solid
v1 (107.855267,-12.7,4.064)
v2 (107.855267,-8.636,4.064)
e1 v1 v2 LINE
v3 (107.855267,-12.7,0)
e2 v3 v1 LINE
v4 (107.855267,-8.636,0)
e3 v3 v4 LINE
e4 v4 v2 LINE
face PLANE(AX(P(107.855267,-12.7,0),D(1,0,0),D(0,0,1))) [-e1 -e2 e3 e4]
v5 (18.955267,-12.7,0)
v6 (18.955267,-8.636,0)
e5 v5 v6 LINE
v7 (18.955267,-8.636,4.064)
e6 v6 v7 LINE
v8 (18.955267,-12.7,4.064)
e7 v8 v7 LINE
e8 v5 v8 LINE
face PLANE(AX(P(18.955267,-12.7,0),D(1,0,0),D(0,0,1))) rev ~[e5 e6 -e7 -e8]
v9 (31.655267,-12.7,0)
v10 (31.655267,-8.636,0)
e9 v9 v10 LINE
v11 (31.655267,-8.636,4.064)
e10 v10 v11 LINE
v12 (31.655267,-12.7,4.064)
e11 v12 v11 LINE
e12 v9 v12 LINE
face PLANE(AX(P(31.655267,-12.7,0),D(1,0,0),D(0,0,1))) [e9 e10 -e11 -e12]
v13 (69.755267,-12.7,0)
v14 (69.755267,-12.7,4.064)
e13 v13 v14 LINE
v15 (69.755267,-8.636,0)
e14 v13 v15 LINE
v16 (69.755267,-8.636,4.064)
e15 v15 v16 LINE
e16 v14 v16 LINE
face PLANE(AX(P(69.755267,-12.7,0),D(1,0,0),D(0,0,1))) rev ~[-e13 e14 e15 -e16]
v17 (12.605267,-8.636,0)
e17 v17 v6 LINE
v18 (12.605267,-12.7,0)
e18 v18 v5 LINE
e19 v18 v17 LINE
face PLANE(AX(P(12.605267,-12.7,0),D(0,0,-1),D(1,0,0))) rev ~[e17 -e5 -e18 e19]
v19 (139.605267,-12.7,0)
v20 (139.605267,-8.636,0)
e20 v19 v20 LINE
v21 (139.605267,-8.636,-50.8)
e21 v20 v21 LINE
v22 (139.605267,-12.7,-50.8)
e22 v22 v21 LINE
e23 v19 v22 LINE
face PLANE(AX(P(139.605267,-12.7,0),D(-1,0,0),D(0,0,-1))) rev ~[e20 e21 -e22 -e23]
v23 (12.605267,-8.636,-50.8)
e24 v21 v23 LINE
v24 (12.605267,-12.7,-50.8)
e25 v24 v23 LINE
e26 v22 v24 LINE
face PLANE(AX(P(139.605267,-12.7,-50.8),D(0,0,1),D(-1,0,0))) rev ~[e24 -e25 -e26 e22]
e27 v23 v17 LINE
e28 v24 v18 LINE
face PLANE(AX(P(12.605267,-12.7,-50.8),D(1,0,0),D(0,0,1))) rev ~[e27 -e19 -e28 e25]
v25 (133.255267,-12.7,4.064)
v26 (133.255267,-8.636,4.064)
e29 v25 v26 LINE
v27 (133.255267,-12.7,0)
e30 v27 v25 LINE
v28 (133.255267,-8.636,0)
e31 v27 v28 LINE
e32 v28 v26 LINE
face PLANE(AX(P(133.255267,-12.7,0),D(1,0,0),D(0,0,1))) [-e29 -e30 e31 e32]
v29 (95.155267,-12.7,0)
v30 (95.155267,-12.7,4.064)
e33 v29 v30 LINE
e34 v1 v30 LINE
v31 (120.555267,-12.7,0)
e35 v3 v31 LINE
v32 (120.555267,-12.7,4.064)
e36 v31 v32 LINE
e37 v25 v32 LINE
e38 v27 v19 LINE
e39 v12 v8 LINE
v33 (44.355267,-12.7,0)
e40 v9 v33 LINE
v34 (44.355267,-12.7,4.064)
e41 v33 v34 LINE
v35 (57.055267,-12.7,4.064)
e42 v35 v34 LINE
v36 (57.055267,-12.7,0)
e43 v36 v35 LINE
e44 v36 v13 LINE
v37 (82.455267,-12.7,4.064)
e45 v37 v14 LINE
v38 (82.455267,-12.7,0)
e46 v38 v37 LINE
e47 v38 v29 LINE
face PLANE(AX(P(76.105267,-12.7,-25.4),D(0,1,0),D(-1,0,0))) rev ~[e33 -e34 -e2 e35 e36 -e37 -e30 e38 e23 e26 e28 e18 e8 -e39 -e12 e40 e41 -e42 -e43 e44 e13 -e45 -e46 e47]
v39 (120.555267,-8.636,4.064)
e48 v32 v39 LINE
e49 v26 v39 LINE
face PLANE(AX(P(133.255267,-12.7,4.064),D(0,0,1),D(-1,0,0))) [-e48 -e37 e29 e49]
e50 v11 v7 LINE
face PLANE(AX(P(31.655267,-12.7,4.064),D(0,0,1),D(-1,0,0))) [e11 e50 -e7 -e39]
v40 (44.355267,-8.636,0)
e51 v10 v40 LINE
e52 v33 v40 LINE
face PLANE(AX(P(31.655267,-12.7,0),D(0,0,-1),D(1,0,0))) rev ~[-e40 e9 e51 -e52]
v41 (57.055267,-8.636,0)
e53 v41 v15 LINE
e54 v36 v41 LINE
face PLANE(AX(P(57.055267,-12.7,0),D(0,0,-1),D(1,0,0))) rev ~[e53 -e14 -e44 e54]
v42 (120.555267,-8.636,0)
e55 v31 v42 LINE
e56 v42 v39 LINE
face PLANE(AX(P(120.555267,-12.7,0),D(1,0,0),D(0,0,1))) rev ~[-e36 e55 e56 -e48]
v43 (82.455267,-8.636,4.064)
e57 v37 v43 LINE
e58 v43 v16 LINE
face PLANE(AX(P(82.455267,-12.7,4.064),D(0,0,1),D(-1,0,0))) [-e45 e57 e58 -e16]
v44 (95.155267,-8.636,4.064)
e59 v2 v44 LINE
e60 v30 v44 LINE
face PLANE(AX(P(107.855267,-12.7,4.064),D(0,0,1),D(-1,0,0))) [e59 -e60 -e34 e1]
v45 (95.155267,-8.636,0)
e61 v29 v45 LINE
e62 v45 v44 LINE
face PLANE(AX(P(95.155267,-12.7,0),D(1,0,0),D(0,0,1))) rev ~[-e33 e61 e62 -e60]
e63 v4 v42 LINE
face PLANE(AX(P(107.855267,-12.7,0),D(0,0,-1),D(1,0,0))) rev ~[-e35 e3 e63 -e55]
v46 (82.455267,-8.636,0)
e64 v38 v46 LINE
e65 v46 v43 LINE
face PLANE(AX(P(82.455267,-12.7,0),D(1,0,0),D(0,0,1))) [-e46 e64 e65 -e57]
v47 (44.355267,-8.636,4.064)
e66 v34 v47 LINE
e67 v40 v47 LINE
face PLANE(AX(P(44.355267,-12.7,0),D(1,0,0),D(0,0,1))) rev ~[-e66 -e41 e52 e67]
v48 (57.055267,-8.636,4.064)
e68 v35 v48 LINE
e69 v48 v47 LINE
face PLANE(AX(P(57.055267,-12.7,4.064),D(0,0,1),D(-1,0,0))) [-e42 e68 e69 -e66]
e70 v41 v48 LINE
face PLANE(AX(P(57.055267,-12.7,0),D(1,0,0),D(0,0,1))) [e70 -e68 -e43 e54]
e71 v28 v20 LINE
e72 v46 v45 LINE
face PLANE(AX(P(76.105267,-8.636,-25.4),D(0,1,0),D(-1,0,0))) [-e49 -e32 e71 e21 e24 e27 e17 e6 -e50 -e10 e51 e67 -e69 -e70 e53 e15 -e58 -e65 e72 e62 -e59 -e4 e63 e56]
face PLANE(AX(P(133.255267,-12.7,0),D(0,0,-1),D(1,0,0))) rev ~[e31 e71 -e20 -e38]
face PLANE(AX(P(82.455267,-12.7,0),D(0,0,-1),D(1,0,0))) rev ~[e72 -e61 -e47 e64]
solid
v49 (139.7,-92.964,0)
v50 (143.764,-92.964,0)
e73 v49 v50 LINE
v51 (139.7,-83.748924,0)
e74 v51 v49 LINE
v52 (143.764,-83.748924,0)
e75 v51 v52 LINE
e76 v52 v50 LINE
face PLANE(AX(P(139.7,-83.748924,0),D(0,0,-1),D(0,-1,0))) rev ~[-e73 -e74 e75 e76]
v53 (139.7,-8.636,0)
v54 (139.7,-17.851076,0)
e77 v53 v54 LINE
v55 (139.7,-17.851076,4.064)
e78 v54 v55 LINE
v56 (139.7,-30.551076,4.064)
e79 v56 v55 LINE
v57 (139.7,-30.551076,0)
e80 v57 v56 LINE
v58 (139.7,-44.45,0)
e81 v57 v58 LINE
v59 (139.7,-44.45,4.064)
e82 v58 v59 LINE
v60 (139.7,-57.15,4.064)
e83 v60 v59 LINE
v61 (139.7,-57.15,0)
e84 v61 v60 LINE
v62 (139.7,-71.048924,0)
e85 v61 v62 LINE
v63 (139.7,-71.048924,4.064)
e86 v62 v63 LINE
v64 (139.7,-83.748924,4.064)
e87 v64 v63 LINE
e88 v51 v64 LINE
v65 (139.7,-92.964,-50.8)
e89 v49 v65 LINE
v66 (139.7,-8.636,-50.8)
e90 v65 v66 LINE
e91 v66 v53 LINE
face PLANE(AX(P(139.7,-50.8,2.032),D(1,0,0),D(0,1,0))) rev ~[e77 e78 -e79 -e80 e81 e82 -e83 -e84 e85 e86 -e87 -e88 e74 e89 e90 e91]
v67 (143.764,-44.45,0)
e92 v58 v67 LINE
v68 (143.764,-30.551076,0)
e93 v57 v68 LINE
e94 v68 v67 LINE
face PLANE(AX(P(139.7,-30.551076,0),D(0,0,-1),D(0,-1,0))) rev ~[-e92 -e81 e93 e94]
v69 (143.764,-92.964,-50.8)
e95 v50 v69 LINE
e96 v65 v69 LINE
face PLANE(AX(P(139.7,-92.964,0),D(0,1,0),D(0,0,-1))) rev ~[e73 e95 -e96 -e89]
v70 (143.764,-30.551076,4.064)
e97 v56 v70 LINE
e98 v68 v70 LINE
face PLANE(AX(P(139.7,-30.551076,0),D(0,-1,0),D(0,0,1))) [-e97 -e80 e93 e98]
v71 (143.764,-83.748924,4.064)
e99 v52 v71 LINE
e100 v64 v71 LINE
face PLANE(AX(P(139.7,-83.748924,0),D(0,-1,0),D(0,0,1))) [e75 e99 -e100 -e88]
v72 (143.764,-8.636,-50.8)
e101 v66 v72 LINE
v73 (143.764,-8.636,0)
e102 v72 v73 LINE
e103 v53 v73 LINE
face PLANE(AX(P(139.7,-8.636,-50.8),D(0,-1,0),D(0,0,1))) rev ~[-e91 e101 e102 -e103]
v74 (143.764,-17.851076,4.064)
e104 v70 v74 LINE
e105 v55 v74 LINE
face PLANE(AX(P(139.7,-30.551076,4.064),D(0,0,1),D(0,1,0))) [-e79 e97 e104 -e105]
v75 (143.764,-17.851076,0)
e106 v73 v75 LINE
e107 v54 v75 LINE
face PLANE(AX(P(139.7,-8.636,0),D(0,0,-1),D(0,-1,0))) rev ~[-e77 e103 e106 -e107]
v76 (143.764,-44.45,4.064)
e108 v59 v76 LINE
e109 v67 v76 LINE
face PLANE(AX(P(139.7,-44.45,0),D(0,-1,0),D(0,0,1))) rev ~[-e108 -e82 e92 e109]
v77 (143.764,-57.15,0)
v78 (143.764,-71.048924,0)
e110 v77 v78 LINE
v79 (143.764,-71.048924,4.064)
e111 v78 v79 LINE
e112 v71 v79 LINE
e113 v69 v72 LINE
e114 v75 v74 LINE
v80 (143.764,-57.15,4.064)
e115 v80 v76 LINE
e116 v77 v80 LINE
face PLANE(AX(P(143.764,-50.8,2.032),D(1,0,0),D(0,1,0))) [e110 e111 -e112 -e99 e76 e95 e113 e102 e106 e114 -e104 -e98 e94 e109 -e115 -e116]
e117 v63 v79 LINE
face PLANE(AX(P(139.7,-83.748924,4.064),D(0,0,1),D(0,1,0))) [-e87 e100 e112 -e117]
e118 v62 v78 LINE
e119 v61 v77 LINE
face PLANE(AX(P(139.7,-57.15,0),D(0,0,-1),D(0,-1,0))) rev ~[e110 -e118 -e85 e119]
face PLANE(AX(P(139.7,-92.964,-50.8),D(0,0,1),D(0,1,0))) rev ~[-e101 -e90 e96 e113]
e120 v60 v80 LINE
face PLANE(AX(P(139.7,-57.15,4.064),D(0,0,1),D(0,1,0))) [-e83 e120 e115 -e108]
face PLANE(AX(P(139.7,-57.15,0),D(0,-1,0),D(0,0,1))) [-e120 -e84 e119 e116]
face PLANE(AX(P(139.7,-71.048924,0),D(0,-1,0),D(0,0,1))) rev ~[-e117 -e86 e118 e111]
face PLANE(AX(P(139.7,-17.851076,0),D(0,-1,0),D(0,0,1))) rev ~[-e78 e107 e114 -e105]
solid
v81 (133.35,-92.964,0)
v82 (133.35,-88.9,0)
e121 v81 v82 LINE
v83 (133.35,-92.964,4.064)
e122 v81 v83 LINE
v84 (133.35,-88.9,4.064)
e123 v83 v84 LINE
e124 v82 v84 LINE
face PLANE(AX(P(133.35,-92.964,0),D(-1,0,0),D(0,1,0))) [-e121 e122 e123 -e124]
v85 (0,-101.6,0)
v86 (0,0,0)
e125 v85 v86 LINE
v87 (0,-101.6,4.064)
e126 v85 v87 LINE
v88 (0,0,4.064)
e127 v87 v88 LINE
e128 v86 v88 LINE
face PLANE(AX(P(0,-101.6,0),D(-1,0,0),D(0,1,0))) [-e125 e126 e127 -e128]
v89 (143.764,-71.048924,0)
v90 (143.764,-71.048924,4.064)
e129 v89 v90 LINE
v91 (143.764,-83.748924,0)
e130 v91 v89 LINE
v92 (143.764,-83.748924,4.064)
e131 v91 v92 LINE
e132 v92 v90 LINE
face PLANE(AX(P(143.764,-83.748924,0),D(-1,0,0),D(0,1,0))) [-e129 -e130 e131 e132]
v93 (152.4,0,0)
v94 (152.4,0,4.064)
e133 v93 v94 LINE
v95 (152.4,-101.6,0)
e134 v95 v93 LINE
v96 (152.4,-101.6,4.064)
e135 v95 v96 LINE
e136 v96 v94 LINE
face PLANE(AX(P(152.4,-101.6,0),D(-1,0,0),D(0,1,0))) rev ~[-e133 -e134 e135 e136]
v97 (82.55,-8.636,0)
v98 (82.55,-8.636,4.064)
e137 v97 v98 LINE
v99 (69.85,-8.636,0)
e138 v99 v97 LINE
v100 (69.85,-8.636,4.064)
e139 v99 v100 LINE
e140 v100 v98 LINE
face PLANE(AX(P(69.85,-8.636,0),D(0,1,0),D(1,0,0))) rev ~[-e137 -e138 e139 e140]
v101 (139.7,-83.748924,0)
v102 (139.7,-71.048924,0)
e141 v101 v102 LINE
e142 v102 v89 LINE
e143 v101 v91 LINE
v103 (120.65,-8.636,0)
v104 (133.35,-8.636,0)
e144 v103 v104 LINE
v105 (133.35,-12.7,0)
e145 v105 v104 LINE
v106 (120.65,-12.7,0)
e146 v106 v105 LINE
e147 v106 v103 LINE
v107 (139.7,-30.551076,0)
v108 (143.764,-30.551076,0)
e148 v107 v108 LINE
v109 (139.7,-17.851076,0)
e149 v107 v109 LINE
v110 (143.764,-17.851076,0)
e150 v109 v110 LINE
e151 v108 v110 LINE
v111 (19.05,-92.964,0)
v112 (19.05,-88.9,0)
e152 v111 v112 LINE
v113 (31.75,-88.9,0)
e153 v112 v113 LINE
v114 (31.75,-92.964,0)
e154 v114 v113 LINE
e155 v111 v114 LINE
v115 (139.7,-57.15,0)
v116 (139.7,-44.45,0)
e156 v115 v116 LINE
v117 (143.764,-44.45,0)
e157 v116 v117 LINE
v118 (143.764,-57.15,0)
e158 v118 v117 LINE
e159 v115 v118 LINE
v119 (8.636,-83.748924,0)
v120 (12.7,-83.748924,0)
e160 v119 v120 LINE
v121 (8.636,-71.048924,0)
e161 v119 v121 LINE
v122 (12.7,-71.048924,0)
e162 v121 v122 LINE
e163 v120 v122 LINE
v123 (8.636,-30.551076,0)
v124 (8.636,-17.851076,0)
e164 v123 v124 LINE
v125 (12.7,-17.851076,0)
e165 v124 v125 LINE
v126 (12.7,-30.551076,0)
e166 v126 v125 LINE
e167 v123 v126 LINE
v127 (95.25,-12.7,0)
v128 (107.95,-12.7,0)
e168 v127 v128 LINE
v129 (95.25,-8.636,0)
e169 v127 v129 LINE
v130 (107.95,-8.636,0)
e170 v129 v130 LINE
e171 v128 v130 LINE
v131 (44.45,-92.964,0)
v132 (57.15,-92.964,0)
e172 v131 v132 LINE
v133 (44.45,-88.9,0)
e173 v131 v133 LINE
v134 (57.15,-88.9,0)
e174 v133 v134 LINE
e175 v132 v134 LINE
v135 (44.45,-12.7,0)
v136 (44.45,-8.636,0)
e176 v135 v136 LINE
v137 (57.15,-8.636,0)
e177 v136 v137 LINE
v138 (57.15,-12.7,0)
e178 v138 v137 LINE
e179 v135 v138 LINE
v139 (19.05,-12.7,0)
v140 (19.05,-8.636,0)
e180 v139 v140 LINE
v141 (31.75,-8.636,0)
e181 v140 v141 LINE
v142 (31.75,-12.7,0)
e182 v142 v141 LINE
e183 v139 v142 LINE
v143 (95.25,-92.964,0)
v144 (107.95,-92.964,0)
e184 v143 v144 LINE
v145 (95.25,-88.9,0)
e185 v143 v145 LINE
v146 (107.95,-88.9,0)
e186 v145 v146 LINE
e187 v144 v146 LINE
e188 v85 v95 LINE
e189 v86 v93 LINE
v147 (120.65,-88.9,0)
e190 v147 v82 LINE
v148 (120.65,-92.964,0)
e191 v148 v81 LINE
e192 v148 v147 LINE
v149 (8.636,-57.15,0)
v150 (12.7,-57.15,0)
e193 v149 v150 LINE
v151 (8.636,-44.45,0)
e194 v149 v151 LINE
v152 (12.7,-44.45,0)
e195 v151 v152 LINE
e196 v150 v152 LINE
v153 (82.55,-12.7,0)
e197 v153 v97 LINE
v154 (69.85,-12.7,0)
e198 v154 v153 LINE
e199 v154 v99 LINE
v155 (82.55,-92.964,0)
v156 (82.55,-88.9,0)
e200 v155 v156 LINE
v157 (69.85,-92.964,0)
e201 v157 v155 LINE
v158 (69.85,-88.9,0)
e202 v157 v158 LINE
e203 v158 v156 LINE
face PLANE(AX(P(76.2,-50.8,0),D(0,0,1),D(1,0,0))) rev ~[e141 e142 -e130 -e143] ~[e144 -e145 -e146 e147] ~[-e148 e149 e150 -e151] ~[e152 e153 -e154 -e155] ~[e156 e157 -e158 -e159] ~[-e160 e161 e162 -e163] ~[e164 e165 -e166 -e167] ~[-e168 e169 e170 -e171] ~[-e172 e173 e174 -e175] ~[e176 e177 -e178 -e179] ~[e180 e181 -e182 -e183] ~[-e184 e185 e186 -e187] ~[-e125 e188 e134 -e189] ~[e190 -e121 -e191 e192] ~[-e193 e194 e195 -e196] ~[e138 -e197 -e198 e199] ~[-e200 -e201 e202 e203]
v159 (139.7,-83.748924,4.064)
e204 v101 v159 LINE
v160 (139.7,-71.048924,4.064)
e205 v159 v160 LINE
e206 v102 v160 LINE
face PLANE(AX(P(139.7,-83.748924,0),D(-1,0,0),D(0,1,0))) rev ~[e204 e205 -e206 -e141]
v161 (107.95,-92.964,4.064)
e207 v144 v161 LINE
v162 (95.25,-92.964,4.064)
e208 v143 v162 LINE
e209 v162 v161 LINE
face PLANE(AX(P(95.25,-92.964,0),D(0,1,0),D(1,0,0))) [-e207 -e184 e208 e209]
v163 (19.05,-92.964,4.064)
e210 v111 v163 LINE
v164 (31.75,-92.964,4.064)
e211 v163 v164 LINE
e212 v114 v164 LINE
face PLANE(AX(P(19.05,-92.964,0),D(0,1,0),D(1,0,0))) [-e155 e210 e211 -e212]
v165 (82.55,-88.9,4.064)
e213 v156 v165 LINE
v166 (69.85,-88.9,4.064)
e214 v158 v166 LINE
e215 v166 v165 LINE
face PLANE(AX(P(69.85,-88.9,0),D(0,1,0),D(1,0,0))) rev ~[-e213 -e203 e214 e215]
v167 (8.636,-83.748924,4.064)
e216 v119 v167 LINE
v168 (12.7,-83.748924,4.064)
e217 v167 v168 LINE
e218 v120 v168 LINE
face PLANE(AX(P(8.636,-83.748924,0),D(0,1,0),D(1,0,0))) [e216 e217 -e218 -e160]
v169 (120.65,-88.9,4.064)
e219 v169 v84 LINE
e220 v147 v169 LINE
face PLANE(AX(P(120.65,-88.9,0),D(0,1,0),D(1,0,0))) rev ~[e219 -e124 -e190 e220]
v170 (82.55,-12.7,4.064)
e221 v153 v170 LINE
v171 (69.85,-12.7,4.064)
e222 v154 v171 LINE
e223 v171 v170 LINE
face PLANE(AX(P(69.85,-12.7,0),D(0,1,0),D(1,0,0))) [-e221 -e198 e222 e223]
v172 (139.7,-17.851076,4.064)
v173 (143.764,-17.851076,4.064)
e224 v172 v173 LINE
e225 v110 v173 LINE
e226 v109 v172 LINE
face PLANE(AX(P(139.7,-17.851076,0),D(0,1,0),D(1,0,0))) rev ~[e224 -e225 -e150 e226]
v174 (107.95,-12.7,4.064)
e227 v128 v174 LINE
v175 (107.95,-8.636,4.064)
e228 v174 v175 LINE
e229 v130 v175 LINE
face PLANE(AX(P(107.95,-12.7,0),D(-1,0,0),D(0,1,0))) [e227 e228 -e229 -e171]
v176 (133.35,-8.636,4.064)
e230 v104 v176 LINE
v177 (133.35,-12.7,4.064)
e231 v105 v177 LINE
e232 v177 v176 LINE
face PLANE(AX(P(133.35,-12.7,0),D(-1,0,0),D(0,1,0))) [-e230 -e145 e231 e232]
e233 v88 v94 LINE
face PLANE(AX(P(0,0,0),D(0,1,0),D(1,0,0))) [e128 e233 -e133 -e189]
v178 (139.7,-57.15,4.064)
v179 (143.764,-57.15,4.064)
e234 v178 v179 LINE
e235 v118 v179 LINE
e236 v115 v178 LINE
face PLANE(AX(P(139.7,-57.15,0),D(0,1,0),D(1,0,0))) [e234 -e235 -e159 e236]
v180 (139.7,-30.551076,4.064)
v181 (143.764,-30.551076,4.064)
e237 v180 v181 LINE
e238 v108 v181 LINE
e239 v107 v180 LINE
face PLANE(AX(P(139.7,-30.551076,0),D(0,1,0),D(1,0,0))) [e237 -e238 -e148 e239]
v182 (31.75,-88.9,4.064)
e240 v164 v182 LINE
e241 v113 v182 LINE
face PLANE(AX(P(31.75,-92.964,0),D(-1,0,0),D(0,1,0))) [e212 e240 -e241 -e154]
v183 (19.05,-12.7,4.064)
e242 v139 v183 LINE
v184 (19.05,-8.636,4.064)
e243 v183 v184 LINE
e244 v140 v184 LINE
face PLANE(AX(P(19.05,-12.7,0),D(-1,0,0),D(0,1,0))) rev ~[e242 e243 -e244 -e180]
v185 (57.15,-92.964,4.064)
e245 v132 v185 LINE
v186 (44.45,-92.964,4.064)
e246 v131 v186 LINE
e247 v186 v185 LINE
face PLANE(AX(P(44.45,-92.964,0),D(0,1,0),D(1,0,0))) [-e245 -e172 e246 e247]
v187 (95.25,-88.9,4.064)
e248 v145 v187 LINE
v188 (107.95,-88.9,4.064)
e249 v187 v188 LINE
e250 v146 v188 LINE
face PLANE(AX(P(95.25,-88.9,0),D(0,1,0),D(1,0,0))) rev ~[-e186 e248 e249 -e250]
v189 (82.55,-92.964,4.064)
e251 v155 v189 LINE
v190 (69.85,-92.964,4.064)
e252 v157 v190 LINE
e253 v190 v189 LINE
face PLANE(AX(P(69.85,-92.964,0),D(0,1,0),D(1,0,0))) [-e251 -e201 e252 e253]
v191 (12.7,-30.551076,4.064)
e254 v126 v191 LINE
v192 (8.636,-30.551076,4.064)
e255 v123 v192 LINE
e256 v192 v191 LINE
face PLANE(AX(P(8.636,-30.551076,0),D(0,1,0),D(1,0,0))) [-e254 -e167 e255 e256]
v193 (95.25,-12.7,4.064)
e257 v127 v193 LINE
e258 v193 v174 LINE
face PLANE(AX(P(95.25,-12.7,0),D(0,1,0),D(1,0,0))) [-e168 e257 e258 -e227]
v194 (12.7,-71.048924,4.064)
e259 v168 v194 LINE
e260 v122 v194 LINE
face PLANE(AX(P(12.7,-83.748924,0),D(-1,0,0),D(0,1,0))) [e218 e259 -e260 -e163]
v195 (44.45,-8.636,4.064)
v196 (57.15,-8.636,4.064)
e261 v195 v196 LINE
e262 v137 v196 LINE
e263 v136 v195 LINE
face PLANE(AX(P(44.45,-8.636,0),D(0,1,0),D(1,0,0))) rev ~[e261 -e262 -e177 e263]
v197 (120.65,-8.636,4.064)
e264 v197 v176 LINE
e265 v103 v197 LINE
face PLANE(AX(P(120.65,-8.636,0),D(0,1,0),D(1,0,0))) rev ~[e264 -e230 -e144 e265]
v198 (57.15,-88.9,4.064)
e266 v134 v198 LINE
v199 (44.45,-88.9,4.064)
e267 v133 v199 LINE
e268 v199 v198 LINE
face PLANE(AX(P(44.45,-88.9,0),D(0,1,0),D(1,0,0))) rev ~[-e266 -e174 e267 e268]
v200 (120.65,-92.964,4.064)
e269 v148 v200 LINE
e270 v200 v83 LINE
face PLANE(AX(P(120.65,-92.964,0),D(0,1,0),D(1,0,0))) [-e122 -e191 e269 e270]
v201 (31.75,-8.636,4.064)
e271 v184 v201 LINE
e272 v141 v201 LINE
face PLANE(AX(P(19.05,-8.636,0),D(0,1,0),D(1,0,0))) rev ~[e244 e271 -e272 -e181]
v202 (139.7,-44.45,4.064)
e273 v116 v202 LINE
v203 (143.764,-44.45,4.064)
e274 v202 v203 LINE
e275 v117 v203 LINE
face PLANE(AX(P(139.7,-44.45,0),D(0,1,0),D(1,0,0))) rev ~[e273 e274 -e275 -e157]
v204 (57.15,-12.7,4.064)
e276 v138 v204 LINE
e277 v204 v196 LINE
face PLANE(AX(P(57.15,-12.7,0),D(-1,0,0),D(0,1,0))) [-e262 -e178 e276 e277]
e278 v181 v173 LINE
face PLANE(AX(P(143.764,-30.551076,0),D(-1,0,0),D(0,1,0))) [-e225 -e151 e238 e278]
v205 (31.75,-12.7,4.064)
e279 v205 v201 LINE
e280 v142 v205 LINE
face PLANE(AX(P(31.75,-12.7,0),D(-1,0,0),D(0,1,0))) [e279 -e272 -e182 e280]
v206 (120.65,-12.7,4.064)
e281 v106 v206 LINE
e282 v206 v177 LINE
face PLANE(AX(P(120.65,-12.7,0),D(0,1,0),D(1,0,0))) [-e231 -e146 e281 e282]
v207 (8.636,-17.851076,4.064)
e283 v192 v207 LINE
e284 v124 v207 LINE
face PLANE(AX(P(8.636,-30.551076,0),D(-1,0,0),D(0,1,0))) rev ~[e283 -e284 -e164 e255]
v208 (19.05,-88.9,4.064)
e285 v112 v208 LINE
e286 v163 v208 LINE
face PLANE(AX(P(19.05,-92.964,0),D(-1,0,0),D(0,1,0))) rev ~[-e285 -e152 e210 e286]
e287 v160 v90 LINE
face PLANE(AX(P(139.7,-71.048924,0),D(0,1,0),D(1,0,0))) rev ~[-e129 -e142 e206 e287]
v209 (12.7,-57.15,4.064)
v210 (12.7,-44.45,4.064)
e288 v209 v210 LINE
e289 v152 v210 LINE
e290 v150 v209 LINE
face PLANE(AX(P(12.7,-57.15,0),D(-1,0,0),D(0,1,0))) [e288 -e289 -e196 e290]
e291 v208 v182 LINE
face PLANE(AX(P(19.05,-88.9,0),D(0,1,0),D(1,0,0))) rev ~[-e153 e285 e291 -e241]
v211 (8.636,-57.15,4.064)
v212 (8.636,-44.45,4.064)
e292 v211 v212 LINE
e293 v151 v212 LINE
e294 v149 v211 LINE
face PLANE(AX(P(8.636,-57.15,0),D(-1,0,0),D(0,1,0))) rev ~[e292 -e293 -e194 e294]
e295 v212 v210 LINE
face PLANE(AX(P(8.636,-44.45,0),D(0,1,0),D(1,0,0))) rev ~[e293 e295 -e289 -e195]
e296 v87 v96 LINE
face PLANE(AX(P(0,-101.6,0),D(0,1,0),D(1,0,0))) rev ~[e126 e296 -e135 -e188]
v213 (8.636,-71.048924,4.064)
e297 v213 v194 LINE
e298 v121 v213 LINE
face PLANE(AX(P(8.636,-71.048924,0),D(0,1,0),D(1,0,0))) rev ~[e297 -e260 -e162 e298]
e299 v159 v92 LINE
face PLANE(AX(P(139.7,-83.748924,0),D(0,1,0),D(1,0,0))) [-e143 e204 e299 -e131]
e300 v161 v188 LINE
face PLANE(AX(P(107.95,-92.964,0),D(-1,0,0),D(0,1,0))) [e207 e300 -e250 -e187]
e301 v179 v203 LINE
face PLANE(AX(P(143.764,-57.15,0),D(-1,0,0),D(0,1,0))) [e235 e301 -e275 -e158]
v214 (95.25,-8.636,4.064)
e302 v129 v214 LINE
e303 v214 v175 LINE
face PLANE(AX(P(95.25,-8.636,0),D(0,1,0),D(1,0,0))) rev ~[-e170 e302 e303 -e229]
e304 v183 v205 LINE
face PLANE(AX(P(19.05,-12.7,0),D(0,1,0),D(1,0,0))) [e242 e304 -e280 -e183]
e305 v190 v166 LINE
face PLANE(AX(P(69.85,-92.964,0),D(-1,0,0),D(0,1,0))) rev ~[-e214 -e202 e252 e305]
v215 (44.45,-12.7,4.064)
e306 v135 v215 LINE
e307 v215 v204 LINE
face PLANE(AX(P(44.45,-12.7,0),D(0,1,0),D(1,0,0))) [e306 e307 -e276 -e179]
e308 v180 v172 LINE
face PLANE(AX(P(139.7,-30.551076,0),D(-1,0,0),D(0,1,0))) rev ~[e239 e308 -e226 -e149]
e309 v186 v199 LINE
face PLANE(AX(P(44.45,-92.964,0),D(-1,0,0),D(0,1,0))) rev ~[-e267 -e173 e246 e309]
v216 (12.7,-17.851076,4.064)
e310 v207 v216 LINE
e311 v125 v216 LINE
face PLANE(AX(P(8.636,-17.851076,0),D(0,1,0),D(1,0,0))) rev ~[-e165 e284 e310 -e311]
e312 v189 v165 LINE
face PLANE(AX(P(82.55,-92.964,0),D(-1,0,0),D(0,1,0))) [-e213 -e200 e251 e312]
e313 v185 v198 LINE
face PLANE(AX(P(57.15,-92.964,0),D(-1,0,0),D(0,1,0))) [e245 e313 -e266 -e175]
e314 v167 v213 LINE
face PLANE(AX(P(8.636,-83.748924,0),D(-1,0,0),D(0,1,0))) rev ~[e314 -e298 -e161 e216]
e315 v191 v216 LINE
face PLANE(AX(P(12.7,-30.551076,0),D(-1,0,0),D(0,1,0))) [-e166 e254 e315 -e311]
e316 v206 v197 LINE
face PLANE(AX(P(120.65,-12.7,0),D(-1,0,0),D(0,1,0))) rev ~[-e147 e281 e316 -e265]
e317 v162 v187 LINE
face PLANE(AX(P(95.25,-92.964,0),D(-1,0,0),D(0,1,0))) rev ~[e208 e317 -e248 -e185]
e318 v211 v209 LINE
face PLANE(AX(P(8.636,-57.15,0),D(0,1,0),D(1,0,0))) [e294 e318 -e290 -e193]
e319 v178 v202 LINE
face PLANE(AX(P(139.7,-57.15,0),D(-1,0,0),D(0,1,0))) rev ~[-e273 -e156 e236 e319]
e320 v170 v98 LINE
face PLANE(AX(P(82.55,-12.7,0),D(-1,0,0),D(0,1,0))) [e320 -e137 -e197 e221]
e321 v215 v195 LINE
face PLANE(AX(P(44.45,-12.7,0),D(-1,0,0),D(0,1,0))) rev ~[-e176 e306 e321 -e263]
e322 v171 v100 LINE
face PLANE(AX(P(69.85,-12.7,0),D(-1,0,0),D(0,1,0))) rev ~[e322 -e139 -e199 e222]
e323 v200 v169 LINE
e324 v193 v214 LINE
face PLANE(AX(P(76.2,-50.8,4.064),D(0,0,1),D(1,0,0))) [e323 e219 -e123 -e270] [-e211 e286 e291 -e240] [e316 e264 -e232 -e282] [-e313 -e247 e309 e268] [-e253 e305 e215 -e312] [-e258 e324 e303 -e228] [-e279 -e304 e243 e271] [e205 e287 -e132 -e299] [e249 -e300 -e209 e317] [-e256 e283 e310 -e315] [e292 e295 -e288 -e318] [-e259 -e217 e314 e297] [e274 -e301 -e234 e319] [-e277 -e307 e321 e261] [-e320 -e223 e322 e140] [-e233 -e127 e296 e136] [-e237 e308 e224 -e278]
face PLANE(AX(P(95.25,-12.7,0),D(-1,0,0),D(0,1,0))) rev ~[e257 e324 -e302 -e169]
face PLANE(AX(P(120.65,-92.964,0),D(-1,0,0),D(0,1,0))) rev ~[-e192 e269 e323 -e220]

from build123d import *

# Parameters (mm, degrees)
F1_W     = 152.4
F1_H     = 101.6
F1_W_2   = 12.7
F1_H_2   = 4.064
F1_W_3   = 4.064
F1_H_3   = 12.7
F2_DEPTH = 4.064
F3_W     = 12.7
F3_H     = 4.064
F4_DEPTH = 4.064
F5_W     = 12.7
F5_H     = 4.064
F6_DEPTH = 4.064


with BuildPart() as f2:
    # F1 (on Top) → F2 (new body)
    with BuildSketch(Plane.XY):
        with Locations((76.2, -50.8)):
            Rectangle(F1_W, F1_H)
        with Locations((25.4, -90.932)):
            Rectangle(F1_W_2, F1_H_2, mode=Mode.SUBTRACT)
        with Locations((10.668, -77.3989244119)):
            Rectangle(F1_W_3, F1_H_3, mode=Mode.SUBTRACT)
        with Locations((50.8, -90.932)):
            Rectangle(F1_W_2, F1_H_2, mode=Mode.SUBTRACT)
        with Locations((76.2, -90.932)):
            Rectangle(F1_W_2, F1_H_2, mode=Mode.SUBTRACT)
        with Locations((10.668, -50.8)):
            Rectangle(F1_W_3, F1_H_3, mode=Mode.SUBTRACT)
        with Locations((101.6, -90.932)):
            Rectangle(F1_W_2, F1_H_2, mode=Mode.SUBTRACT)
        with Locations((127, -90.932)):
            Rectangle(F1_W_2, F1_H_2, mode=Mode.SUBTRACT)
        with Locations((141.732, -77.3989244119)):
            Rectangle(F1_W_3, F1_H_3, mode=Mode.SUBTRACT)
        with Locations((141.732, -50.8)):
            Rectangle(F1_W_3, F1_H_3, mode=Mode.SUBTRACT)
        with Locations((10.668, -24.2010755881)):
            Rectangle(F1_W_3, F1_H_3, mode=Mode.SUBTRACT)
        with Locations((25.4, -10.668)):
            Rectangle(F1_W_2, F1_H_2, mode=Mode.SUBTRACT)
        with Locations((50.8, -10.668)):
            Rectangle(F1_W_2, F1_H_2, mode=Mode.SUBTRACT)
        with Locations((76.2, -10.668)):
            Rectangle(F1_W_2, F1_H_2, mode=Mode.SUBTRACT)
        with Locations((101.6, -10.668)):
            Rectangle(F1_W_2, F1_H_2, mode=Mode.SUBTRACT)
        with Locations((141.732, -24.2010755881)):
            Rectangle(F1_W_3, F1_H_3, mode=Mode.SUBTRACT)
        with Locations((127, -10.668)):
            Rectangle(F1_W_2, F1_H_2, mode=Mode.SUBTRACT)
    extrude(amount=F2_DEPTH)


with BuildPart() as f4:
    # F3 (on face) → F4 (new body)
    with BuildSketch(Plane(origin=(0, -12.7, 0), x_dir=(-1, 0, 0), z_dir=(0, 1, 0))):
        Polygon((-12.6052666744, -50.8), (-12.6052666744, 0), (-18.9552666744, 0), (-31.6552666744, 0), (-44.3552666744, 0), (-57.0552666744, 0), (-69.7552666744, 0), (-82.4552666744, 0), (-95.1552666744, 0), (-107.8552666744, 0), (-120.5552666744, 0), (-133.2552666744, 0), (-139.6052666744, 0), (-139.6052666744, -50.8), align=None)
        with Locations((-25.3052666744, 2.032)):
            Rectangle(F3_W, F3_H)
        with Locations((-50.7052666744, 2.032)):
            Rectangle(F3_W, F3_H)
        with Locations((-126.9052666744, 2.032)):
            Rectangle(F3_W, F3_H)
        with Locations((-76.1052666744, 2.032)):
            Rectangle(F3_W, F3_H)
        with Locations((-101.5052666744, 2.032)):
            Rectangle(F3_W, F3_H)
    extrude(amount=F4_DEPTH)


with BuildPart() as f6:
    # F5 (on face) → F6 (new body)
    with BuildSketch(Plane.YZ.offset(139.7)):
        with Locations((-50.8, 2.032)):
            Rectangle(F5_W, F5_H)
        with Locations((-24.2010755881, 2.032)):
            Rectangle(F5_W, F5_H)
        with Locations((-77.3989244119, 2.032)):
            Rectangle(F5_W, F5_H)
        Polygon((-8.636, -50.8), (-8.636, 0), (-17.8510755881, 0), (-30.5510755881, 0), (-44.45, 0), (-57.15, 0), (-71.0489244119, 0), (-83.7489244119, 0), (-92.964, 0), (-92.964, -50.8), align=None)
    extrude(amount=F6_DEPTH)


solid = Compound([f2.part, f4.part, f6.part])
